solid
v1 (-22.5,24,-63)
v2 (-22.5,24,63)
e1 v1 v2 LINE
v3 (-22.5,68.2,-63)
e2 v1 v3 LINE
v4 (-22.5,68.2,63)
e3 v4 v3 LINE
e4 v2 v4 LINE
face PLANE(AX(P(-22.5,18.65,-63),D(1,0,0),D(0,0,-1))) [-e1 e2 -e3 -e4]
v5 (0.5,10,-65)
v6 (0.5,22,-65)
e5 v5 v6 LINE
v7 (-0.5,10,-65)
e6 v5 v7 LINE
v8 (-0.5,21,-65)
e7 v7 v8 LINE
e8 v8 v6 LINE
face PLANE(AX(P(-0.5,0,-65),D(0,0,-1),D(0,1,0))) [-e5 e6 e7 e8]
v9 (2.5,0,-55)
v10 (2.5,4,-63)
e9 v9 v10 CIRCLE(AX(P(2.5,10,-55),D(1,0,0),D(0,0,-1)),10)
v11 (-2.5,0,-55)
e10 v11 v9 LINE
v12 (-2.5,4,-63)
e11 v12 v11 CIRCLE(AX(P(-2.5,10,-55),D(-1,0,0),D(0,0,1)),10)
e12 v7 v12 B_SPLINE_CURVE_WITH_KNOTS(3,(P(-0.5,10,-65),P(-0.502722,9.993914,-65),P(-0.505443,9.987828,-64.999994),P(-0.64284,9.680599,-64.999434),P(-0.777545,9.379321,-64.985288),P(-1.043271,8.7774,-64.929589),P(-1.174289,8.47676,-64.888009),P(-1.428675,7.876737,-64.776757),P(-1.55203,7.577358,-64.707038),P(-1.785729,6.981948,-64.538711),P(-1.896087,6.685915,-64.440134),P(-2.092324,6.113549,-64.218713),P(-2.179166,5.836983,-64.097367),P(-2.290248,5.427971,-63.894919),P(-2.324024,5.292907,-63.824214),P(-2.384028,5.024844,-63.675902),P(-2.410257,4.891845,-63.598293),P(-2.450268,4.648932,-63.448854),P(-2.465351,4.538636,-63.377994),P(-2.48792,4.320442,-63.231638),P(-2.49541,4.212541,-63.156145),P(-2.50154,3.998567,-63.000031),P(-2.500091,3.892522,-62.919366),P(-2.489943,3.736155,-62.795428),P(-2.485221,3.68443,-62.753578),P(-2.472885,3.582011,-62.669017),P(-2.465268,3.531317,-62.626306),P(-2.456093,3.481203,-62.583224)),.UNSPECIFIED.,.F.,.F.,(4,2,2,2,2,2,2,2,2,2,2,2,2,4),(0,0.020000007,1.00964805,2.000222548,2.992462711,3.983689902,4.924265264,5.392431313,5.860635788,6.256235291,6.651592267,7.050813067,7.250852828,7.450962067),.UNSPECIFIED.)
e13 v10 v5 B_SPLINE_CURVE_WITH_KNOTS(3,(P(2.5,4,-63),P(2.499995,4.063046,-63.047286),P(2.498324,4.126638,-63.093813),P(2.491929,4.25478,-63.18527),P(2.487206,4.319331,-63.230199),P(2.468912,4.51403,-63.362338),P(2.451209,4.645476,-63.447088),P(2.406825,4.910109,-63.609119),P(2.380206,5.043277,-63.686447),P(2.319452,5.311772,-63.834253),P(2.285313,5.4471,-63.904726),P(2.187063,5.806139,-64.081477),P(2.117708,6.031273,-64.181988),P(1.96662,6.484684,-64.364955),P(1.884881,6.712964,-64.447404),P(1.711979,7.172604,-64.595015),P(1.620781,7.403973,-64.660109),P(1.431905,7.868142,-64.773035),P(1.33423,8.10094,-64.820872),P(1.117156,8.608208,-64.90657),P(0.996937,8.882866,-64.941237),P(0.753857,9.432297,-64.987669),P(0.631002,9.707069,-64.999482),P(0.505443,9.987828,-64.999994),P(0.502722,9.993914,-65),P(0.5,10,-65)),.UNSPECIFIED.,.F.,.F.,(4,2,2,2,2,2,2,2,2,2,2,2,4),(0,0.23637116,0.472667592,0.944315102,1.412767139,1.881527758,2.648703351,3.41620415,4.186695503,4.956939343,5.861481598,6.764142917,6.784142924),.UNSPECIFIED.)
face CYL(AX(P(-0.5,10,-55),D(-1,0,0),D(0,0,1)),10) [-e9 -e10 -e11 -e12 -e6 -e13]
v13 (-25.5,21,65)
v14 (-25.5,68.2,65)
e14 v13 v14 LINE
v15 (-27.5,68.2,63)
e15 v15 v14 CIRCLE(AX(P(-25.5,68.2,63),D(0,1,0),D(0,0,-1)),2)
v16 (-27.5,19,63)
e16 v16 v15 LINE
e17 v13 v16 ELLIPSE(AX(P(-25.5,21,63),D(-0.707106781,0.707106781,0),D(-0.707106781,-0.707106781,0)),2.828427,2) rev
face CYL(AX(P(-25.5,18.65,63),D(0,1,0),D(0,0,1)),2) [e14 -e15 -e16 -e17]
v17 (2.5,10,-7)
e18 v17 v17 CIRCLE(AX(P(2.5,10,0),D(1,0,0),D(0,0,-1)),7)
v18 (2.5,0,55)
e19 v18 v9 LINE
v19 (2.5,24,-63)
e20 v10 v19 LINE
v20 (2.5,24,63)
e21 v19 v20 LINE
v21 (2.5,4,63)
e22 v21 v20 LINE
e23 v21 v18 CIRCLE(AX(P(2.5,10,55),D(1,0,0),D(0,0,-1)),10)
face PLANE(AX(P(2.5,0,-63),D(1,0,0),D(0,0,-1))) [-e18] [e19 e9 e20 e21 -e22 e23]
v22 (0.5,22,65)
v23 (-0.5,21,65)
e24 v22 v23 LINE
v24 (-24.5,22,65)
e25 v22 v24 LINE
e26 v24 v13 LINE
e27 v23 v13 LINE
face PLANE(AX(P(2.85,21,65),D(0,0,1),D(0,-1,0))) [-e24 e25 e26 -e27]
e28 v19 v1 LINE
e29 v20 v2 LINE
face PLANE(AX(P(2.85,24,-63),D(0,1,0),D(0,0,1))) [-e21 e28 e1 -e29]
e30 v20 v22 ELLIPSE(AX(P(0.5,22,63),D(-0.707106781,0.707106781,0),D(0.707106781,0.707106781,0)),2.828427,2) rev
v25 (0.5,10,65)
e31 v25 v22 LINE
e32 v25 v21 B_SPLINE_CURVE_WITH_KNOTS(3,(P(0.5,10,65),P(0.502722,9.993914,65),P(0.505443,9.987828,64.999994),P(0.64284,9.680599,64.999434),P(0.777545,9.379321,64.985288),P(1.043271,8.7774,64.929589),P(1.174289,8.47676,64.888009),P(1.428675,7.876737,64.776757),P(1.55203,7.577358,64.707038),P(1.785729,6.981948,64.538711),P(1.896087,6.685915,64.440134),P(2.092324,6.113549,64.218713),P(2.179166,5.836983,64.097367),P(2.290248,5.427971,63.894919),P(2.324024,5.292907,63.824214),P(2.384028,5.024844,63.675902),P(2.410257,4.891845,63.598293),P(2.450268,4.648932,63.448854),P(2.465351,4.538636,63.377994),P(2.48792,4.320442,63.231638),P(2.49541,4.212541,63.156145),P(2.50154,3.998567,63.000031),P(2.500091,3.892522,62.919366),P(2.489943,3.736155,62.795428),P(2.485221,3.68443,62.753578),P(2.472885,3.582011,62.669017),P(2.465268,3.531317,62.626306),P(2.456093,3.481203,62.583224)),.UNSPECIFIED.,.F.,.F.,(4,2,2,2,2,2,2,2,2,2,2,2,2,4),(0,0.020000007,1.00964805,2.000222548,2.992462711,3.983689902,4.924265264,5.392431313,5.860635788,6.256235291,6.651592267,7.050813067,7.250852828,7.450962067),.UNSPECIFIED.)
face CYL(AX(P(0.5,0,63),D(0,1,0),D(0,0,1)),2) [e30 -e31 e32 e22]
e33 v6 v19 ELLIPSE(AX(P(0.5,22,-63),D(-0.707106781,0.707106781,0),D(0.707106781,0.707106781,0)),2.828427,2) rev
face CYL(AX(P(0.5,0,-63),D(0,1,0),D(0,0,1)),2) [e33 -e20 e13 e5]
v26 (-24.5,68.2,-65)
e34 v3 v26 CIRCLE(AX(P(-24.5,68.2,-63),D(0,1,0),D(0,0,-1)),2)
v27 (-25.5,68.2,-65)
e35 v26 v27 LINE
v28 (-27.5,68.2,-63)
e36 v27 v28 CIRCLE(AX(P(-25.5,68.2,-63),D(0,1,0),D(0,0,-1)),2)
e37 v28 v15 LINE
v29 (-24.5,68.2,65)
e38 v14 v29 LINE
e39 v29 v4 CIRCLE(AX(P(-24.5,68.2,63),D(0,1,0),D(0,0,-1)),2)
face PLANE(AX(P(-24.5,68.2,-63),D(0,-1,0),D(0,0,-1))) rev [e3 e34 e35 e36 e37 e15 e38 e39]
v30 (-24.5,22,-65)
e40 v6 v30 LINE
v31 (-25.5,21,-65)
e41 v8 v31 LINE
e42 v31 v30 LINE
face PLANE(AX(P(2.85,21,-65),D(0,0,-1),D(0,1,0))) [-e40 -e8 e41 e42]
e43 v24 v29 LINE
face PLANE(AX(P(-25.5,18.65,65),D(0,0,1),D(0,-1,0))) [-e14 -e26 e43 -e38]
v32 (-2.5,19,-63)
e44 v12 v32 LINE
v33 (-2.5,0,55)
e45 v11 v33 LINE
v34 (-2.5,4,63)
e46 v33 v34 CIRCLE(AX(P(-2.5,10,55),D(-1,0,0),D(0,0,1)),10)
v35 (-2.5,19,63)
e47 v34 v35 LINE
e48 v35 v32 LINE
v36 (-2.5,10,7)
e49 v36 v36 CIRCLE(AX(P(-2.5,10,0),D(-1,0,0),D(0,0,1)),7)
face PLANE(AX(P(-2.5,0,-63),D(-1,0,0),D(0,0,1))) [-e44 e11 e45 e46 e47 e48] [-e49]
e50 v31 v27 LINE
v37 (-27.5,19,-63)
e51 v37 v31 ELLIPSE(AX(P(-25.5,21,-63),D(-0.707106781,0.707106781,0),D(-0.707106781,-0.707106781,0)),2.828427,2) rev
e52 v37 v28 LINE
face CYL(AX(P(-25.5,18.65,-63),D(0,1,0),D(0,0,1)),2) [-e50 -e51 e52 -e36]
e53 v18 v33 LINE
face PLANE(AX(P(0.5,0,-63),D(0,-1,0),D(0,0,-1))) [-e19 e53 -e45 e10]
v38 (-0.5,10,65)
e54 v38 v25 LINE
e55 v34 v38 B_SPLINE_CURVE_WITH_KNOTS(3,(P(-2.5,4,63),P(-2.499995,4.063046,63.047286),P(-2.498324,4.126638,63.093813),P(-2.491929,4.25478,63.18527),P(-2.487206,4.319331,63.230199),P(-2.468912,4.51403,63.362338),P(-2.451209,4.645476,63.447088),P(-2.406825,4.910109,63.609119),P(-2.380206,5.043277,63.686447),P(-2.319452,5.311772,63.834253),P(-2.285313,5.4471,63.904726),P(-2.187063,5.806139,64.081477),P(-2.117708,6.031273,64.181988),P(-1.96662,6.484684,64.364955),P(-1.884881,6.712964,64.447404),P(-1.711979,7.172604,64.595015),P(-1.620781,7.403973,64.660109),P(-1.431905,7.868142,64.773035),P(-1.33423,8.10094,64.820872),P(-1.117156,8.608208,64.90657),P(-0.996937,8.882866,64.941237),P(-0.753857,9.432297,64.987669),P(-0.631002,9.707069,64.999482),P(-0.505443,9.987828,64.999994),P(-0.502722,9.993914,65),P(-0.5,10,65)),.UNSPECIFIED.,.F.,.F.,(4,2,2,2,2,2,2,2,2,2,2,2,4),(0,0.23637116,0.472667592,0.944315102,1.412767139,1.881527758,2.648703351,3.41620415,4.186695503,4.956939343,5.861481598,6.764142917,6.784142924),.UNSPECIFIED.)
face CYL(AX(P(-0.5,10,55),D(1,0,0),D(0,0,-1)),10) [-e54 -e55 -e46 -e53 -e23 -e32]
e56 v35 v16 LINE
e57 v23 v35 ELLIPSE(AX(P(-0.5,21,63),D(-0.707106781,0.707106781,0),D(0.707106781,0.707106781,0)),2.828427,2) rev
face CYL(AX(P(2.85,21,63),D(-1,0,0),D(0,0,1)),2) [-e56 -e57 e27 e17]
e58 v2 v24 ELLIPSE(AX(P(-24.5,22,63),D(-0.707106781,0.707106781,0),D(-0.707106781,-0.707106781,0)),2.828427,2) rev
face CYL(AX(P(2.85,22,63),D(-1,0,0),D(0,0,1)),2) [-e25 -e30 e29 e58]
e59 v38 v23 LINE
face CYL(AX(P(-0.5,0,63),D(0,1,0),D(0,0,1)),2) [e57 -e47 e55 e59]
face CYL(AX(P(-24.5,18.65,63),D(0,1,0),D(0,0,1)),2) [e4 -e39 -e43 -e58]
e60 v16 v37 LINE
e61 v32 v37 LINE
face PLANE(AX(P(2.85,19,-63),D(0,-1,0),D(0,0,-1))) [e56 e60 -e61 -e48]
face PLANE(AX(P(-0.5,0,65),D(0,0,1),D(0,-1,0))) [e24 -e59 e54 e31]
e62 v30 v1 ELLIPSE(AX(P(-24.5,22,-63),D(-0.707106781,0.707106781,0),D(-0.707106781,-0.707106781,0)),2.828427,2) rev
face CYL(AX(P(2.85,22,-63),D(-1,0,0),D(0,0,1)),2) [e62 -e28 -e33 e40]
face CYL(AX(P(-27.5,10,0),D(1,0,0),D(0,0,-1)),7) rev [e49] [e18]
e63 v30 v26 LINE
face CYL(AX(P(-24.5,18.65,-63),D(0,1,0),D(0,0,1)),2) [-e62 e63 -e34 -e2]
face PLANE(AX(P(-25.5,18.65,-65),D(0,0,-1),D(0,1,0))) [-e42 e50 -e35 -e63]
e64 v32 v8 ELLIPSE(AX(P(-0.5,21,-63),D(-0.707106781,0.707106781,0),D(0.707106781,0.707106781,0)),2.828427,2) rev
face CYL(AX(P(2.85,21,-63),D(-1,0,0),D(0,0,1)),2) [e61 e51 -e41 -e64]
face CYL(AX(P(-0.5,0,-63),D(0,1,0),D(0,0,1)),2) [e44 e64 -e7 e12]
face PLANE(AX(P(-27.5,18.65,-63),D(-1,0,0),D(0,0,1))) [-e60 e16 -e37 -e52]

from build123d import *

# Parameters (mm, degrees)
CUT_EXTRUDE1_DEPTH      = 99.145249503
CUT_EXTRUDE1_DEPTH_BACK = 99.145249503
SKETCH3_R               = 7
FILLET2_R               = 10
FILLET3_R               = 10


with BuildPart() as part:
    # Sweep1: sweep along a curve in space
    with BuildLine() as sweep1_path:
        Line((0, 0, 0), (0, 21.5, 0))
        Line((0, 21.5, 0), (-25, 21.5, 0))
        Line((-25, 21.5, 0), (-25, 68.2, 0))
    # Sketch2 → Sweep1 (sweep)
    with BuildSketch(Plane(origin=(0, 0, 0), x_dir=(1, 0, 0), z_dir=(0, 1, 0))):
        with BuildLine():
            Line((-0.5, 65), (0.5, 65))
            ThreePointArc((0.5, 65), (1.914213562, 64.414213562), (2.5, 63))
            Line((2.5, 63), (2.5, -63))
            ThreePointArc((2.5, -63), (1.914213562, -64.414213562), (0.5, -65))
            Line((0.5, -65), (-0.5, -65))
            ThreePointArc((-0.5, -65), (-1.914213562, -64.414213562), (-2.5, -63))
            Line((-2.5, -63), (-2.5, 63))
            ThreePointArc((-2.5, 63), (-1.914213562, 64.414213562), (-0.5, 65))
        make_face()
    sweep(path=sweep1_path.line, transition=Transition.RIGHT)

    # Sketch3 → Cut-Extrude1 (cut, two sides: drawn at the far end of the back side and taken through both)
    with BuildSketch(Plane(origin=(0, 0, 0), x_dir=(0, 0, -1), z_dir=(1, 0, 0)).offset(-CUT_EXTRUDE1_DEPTH_BACK)):
        with Locations((0, 10)):
            Circle(SKETCH3_R)
    extrude(amount=CUT_EXTRUDE1_DEPTH + CUT_EXTRUDE1_DEPTH_BACK, mode=Mode.SUBTRACT)

    # Fillet2
    # the kernel refuses this fillet: 10 mm, written as the material it takes off along each edge
    with BuildSketch(Plane(origin=(25.5, 0, -65), x_dir=(0, 1, 0), z_dir=(-1, 0, 0))) as fillet2_piece_1:
        with BuildLine():
            CenterArc((FILLET2_R, -FILLET2_R), FILLET2_R, 90, 90)
            Line((0, -FILLET2_R), (0, 0))
            Line((0, 0), (FILLET2_R, 0))
        make_face()
    extrude(amount=51, mode=Mode.SUBTRACT)

    # Fillet3
    # the kernel refuses this fillet: 10 mm, written as the material it takes off along each edge
    with BuildSketch(Plane(origin=(-25.5, 0, 65), x_dir=(0, 1, 0), z_dir=(1, 0, 0))) as fillet3_piece_1:
        with BuildLine():
            CenterArc((FILLET3_R, -FILLET3_R), FILLET3_R, 90, 90)
            Line((0, -FILLET3_R), (0, 0))
            Line((0, 0), (FILLET3_R, 0))
        make_face()
    extrude(amount=51, mode=Mode.SUBTRACT)


solid = part.part
